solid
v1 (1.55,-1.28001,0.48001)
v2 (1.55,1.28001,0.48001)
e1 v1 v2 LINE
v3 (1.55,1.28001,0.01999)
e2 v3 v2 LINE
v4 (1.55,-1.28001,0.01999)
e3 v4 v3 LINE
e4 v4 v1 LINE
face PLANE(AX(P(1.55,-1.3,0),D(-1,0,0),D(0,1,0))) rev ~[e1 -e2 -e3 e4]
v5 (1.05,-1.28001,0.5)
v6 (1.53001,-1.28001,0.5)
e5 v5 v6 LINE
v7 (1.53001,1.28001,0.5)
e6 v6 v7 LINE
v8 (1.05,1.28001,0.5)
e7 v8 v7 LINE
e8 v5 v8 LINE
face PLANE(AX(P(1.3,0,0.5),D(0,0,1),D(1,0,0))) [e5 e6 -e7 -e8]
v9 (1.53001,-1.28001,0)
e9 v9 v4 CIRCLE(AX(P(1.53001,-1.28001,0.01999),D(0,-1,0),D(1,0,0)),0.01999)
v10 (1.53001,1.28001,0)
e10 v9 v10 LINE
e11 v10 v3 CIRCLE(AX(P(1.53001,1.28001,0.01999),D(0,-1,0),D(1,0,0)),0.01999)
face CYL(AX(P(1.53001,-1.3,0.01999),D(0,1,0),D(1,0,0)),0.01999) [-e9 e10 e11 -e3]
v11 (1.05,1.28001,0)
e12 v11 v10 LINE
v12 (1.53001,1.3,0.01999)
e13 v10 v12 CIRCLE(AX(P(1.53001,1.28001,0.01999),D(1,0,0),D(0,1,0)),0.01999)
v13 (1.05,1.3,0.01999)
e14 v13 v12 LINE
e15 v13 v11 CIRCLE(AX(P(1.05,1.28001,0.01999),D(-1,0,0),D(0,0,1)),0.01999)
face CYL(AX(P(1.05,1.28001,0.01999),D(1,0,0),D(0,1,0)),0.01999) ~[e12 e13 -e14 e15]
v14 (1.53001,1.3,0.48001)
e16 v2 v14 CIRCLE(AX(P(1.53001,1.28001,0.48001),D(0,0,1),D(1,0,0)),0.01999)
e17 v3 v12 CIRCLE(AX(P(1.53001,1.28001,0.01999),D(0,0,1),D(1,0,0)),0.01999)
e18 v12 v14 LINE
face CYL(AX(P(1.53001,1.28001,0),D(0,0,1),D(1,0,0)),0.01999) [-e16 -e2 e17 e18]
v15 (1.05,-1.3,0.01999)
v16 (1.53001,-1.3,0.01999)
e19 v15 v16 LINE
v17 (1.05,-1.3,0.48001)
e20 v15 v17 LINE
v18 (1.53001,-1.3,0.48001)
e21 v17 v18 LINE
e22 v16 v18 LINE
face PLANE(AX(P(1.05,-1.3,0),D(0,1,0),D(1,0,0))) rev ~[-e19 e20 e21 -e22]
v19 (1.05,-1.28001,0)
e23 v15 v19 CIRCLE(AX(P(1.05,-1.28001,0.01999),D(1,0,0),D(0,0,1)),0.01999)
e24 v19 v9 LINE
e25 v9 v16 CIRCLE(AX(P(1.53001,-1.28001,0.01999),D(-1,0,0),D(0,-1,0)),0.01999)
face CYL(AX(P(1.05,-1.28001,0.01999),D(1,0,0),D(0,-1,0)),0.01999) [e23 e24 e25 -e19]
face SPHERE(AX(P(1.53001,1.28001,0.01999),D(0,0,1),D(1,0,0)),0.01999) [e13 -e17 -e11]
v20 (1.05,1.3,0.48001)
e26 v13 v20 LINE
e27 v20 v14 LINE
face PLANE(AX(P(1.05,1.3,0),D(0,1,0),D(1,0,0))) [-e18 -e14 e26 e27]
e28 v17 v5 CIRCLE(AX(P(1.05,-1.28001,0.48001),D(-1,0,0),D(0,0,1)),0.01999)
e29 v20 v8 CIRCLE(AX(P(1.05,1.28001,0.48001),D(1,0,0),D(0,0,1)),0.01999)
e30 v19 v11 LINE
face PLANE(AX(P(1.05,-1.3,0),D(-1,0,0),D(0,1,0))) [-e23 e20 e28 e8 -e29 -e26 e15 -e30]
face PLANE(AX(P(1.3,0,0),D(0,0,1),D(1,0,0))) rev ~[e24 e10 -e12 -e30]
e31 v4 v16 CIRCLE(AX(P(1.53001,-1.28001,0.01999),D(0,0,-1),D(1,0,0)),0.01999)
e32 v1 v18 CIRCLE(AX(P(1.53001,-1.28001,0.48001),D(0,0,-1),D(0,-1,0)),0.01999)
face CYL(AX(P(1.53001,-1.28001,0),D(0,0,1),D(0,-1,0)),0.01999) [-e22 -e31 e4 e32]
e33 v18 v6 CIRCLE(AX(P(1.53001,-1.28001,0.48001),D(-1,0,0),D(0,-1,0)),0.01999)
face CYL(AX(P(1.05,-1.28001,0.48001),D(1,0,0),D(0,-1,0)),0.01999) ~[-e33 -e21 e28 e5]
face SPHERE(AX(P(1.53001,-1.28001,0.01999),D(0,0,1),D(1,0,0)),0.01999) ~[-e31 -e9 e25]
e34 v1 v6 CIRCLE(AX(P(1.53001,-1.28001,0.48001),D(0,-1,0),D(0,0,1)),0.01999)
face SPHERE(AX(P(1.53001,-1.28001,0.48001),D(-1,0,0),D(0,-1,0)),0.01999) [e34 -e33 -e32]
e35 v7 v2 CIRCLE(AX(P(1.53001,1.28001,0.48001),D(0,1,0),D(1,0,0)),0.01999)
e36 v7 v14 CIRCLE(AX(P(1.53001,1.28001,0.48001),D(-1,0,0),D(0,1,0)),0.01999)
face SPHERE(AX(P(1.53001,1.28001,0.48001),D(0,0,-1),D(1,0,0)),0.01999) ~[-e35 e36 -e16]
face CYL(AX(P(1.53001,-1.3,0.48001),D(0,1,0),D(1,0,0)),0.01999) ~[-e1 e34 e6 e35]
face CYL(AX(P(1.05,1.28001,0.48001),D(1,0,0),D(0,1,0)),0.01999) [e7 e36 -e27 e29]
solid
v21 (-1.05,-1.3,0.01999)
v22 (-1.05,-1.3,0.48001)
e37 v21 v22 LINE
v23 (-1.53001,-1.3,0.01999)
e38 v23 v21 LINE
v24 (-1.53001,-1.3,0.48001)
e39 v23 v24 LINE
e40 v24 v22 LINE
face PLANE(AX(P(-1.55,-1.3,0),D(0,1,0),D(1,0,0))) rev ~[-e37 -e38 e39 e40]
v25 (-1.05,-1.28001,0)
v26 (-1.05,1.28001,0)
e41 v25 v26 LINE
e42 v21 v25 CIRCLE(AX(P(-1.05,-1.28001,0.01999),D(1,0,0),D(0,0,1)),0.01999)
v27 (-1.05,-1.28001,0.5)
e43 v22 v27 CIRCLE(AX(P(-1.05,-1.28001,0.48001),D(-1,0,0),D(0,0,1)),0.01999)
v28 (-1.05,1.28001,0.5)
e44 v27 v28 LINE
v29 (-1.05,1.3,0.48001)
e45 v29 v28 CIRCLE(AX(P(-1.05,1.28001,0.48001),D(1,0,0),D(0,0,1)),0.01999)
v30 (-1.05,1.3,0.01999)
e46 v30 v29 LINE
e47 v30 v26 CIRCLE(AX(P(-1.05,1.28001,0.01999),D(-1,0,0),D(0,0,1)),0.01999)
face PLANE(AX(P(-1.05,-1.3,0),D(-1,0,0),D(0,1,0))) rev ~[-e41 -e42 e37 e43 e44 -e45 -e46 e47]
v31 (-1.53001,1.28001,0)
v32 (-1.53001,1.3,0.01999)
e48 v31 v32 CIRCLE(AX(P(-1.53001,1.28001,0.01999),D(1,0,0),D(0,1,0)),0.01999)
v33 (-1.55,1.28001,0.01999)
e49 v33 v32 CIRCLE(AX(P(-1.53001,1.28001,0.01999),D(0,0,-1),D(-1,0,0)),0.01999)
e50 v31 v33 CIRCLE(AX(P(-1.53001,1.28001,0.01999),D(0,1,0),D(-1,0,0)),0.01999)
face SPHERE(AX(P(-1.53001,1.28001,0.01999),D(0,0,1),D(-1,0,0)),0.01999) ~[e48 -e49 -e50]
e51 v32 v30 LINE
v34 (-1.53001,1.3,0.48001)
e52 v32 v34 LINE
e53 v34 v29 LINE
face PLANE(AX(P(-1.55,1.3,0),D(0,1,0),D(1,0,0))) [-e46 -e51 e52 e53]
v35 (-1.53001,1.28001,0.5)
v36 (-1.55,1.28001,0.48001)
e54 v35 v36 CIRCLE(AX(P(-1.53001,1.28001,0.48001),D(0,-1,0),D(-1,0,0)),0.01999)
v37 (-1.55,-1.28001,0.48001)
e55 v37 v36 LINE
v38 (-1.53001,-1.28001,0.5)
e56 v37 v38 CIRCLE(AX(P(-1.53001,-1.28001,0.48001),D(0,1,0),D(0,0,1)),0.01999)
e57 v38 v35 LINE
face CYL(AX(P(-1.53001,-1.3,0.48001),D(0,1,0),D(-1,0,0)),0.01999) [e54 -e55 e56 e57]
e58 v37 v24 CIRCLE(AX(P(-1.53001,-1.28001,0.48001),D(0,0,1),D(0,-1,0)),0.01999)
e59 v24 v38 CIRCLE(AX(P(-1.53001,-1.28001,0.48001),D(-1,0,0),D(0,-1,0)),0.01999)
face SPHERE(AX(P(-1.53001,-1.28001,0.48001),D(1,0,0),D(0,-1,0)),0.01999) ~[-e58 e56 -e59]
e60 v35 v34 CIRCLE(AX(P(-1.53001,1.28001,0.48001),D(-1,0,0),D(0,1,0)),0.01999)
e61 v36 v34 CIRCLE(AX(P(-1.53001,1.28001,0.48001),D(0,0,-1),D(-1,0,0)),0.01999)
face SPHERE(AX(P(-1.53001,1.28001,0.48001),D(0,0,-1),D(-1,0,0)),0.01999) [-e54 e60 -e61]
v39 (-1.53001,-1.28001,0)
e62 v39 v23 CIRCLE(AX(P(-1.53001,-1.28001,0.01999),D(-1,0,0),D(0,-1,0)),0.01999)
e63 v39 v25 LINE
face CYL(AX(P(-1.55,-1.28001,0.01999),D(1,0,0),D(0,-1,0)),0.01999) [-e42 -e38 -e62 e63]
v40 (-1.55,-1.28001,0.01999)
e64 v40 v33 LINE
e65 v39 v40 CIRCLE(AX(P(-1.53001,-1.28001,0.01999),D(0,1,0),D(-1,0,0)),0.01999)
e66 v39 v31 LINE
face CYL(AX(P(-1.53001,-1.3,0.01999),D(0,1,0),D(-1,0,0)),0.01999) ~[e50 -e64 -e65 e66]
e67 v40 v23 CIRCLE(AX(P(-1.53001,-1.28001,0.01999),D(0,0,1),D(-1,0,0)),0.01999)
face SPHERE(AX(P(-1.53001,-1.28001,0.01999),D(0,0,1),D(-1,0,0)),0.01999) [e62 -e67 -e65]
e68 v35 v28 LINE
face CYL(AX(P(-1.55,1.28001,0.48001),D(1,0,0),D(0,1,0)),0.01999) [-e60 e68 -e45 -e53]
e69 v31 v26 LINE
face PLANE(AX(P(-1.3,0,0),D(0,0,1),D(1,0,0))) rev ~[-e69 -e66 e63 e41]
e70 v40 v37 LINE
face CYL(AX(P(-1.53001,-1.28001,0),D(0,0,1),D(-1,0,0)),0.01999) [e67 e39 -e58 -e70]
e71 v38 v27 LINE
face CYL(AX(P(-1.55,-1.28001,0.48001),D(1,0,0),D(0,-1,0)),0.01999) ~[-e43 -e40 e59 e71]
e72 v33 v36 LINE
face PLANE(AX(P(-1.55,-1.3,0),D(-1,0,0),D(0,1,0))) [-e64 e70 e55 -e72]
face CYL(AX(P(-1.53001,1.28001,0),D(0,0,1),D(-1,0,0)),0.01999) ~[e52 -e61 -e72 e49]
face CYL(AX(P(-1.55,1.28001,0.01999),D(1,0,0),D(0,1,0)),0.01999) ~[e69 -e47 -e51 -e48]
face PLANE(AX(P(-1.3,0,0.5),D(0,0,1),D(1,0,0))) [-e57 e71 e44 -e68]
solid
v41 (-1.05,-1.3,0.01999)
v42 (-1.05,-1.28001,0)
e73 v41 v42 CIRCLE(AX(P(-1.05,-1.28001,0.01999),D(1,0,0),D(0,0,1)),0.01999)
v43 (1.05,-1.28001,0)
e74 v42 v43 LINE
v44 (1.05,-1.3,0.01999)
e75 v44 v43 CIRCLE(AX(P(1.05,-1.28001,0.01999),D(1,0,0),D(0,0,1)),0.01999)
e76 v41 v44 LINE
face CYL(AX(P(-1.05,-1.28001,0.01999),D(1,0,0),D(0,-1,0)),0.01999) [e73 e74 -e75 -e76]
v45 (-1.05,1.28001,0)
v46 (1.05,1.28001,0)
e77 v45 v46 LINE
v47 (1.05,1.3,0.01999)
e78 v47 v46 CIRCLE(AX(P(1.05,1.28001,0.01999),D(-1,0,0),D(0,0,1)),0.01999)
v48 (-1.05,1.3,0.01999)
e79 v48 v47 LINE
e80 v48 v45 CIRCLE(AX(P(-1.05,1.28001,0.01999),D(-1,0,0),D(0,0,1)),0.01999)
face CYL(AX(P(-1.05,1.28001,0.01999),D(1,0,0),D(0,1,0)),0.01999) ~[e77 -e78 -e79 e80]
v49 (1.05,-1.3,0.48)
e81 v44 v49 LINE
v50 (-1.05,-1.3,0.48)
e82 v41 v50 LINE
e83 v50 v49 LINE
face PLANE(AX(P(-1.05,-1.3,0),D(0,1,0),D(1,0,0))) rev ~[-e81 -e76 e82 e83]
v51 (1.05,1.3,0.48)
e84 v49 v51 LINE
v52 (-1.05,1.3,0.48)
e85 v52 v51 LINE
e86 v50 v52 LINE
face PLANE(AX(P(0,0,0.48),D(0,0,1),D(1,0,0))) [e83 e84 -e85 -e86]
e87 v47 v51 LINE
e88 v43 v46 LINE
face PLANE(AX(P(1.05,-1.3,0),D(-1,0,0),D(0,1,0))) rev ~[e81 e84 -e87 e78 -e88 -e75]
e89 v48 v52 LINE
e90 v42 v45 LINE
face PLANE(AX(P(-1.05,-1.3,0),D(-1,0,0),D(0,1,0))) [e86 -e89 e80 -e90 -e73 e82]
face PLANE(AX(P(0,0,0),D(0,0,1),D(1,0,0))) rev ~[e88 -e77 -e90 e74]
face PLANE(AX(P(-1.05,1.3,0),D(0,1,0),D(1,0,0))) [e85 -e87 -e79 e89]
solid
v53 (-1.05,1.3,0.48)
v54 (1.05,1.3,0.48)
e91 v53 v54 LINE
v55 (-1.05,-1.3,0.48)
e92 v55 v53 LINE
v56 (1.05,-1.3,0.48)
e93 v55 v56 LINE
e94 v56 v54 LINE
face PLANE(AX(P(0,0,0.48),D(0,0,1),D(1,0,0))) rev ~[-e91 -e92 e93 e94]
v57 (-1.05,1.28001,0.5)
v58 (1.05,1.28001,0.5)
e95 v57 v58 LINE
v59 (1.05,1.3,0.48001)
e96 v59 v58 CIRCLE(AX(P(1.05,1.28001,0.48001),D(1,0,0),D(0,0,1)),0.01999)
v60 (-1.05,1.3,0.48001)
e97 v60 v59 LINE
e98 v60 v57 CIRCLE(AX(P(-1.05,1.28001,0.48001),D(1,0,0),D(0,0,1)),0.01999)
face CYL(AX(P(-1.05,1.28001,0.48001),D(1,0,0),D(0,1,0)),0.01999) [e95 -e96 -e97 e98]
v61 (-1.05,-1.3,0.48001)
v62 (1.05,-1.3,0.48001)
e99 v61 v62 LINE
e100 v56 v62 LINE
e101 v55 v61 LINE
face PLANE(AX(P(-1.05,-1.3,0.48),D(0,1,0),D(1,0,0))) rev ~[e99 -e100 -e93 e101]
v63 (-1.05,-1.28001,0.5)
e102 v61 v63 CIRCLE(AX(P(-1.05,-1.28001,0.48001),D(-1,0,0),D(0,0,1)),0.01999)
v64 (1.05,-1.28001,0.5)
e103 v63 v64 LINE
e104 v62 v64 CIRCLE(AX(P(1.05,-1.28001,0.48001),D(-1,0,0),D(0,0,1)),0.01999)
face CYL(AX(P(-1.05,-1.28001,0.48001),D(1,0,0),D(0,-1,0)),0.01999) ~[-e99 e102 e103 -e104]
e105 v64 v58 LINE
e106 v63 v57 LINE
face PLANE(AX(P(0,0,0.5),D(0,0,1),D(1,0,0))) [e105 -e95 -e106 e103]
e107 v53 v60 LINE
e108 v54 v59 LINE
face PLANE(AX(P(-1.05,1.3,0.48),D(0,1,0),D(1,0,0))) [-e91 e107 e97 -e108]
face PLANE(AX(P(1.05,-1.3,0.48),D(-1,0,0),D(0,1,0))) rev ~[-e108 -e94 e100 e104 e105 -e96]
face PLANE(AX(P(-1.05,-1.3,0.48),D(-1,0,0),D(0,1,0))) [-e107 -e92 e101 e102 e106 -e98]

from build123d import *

# Parameters (mm, degrees)
F2_W     = 2.1
F2_H     = 2.6
F3_DEPTH = 0.48
F2_W_2   = 0.5
F4_DEPTH = 0.5
F5_DEPTH = 0.5
F6_DEPTH = 0.02
F7_R     = 0.01999
F7_2_R   = 0.01999
F7_3_R   = 0.01999
F7_4_R   = 0.01999


# Not quite as in the source:
# - a fillet or chamfer is up to 0.001 mm smaller than in the source, because OpenCascade refuses the exact size


with BuildPart() as f3:
    # F2 (on Top) → F3 (new body)
    with BuildSketch(Plane.XY):
        Rectangle(F2_W, F2_H)
    extrude(amount=F3_DEPTH)


with BuildPart() as f4:
    # F2 (on Top) → F4 (new body)
    with BuildSketch(Plane.XY):
        with Locations((-1.3, 0)):
            Rectangle(F2_W_2, F2_H)
    extrude(amount=F4_DEPTH)

    # F7 (radius 0.02 in the source; OpenCascade refuses exactly that, so slightly less here)
    f7_edges = [f4.edges().sort_by_distance(p)[0] for p in [
        (-1.3, -1.3, 0.5),
        (-1.55, 1.3, 0.25),
        (-1.55, -1.3, 0.25),
        (-1.55, 0, 0),
        (-1.55, 0, 0.5),
        (-1.3, 1.3, 0.5),
        (-1.3, 1.3, 0),
        (-1.3, -1.3, 0),
    ]]
    fillet(f7_edges, radius=F7_R)


with BuildPart() as f5:
    # F2 (on Top) → F5 (new body)
    with BuildSketch(Plane.XY):
        with Locations((1.3, 0)):
            Rectangle(F2_W_2, F2_H)
    extrude(amount=F5_DEPTH)

    # F7#2 (radius 0.02 in the source; OpenCascade refuses exactly that, so slightly less here)
    f7_2_edges = [f5.edges().sort_by_distance(p)[0] for p in [
        (1.3, -1.3, 0.5),
        (1.55, -1.3, 0.25),
        (1.55, 1.3, 0.25),
        (1.55, 0, 0),
        (1.55, 0, 0.5),
        (1.3, 1.3, 0.5),
        (1.3, 1.3, 0),
        (1.3, -1.3, 0),
    ]]
    fillet(f7_2_edges, radius=F7_2_R)


with BuildPart() as f6:
    # F6 (new): a face of the model
    f6_faces = [f3.part.faces().sort_by_distance(p)[0] for p in [
        (0, 0, 0.48),
    ]]
    extrude(f6_faces, amount=F6_DEPTH)

    # F7#4 (radius 0.02 in the source; OpenCascade refuses exactly that, so slightly less here)
    f7_4_edges = [f6.edges().sort_by_distance(p)[0] for p in [
        (0, -1.3, 0.5),
        (0, 1.3, 0.5),
    ]]
    fillet(f7_4_edges, radius=F7_4_R)


with BuildPart() as f3_1:
    add(f3.part)

    # F7#3 (radius 0.02 in the source; OpenCascade refuses exactly that, so slightly less here)
    f7_3_edges = [f3_1.edges().sort_by_distance(p)[0] for p in [
        (0, 1.3, 0),
        (0, -1.3, 0),
    ]]
    fillet(f7_3_edges, radius=F7_3_R)


solid = Compound([f4.part, f5.part, f6.part, f3_1.part])
